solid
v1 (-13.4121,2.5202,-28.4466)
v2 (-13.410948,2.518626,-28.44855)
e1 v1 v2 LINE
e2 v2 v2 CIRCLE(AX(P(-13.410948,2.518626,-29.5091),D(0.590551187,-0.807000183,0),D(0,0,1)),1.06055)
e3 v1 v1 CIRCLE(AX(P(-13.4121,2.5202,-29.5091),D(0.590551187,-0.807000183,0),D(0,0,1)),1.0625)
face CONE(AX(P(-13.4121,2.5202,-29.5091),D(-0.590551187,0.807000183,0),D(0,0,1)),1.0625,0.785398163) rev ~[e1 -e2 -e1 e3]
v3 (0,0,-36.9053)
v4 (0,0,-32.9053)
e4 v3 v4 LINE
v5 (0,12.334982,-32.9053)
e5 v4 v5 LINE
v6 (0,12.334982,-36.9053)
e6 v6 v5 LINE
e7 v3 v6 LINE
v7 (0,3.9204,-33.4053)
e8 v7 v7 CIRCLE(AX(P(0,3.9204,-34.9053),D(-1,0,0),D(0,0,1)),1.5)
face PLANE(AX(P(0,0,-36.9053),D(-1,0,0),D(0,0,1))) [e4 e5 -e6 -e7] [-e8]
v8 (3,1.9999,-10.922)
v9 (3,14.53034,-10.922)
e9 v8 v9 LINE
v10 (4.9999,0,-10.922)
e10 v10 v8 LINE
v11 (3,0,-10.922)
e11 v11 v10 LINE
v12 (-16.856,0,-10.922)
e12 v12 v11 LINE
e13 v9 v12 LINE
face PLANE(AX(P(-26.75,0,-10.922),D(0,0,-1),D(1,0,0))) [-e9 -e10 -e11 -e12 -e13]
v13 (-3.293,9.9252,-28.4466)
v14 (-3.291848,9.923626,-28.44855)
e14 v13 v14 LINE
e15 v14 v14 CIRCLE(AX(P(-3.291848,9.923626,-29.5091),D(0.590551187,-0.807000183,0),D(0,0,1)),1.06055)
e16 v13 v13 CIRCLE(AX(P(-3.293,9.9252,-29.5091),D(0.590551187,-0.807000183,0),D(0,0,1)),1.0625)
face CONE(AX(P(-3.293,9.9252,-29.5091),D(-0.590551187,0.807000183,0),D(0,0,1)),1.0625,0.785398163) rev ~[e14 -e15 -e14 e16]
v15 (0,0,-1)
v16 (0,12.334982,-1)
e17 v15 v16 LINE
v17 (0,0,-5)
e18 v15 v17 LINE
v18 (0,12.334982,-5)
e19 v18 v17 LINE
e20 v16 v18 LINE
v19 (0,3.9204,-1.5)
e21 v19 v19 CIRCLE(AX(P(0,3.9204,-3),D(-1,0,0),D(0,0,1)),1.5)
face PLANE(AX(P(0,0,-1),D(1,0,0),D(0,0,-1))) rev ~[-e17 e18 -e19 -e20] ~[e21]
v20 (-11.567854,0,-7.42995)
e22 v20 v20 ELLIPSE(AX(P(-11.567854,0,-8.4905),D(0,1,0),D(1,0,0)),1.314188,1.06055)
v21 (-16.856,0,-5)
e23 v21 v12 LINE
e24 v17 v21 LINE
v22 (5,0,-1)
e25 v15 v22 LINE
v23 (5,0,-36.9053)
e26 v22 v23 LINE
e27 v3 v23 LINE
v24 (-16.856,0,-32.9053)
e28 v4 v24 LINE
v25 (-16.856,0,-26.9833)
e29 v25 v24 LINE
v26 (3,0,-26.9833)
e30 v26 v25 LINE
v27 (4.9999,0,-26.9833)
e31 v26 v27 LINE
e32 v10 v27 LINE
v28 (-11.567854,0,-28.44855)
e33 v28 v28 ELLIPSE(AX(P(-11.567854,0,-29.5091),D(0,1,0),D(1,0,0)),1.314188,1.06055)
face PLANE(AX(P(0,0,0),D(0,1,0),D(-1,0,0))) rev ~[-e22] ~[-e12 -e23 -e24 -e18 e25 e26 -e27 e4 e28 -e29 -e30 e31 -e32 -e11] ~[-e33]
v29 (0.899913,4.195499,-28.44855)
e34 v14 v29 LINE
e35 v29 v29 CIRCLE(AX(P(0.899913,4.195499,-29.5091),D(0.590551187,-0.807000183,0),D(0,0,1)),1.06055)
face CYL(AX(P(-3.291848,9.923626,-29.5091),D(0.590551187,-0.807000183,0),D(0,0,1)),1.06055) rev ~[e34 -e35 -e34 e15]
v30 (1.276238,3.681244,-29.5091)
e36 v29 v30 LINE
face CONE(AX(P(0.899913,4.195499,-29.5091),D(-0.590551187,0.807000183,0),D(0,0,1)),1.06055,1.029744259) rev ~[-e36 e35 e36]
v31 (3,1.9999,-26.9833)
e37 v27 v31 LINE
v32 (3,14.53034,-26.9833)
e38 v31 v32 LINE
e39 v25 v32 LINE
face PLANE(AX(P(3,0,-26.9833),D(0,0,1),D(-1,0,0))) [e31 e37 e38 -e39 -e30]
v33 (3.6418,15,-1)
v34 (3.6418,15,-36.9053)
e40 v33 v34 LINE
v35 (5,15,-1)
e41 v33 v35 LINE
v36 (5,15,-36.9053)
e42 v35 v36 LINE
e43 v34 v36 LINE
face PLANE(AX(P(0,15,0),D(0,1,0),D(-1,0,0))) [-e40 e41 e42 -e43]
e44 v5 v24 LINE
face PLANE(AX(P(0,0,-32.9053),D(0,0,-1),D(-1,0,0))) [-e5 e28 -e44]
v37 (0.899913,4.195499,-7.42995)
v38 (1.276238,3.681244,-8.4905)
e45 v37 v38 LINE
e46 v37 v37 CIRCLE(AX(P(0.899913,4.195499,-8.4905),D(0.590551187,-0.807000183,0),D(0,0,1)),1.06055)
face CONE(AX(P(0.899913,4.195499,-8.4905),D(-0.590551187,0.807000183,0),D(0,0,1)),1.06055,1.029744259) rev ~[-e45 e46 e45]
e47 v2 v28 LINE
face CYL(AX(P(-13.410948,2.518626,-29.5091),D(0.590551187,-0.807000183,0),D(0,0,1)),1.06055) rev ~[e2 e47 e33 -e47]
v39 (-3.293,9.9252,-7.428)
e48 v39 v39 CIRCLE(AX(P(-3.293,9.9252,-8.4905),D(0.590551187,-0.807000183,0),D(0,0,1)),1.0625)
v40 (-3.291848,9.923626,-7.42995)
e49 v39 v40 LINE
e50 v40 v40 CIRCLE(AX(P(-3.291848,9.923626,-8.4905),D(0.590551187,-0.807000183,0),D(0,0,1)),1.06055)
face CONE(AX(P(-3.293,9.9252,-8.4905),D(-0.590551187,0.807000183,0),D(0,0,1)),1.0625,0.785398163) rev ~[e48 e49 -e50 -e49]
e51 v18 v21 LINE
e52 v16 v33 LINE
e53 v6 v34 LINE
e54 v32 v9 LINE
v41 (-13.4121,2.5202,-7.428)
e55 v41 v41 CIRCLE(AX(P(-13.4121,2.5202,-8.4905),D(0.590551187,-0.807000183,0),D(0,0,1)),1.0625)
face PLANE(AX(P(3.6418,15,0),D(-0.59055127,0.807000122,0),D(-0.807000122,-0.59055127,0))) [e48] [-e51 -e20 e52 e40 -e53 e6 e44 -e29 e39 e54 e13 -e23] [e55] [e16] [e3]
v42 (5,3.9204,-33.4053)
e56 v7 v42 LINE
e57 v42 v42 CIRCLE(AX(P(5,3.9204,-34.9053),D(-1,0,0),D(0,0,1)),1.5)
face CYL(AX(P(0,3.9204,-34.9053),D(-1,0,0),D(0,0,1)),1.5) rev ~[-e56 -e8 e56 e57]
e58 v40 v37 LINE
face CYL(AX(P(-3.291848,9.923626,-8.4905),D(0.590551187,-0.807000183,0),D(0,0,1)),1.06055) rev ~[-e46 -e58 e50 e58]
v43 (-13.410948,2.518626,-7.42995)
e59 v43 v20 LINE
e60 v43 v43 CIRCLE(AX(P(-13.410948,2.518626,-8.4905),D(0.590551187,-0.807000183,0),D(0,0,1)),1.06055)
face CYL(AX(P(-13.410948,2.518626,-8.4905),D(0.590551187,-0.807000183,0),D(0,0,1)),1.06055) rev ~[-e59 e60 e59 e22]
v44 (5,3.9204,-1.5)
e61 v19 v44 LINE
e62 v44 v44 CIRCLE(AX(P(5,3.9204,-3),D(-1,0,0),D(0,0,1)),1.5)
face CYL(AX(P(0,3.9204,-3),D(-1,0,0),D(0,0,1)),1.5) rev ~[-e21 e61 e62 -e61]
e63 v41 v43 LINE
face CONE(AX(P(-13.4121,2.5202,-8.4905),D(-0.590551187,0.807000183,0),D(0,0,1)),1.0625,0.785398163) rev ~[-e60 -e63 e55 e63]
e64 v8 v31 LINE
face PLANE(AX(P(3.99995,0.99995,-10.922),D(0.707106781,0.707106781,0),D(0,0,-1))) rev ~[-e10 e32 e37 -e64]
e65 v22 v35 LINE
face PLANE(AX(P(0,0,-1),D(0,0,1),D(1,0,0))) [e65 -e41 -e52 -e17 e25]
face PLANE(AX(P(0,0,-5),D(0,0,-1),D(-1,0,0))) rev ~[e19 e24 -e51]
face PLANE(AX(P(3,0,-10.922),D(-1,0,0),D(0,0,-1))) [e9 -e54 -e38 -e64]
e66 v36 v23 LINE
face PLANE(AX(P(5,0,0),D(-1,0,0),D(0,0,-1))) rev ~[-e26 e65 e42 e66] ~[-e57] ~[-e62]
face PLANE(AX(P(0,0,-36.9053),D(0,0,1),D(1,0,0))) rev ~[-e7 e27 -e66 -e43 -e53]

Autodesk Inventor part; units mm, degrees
ref_plane "YZ Plane" through (0, 0, 0) normal (1, 0, 0) x (0, 1, 0)
ref_plane "XZ Plane" through (0, 0, 0) normal (0, 1, 0) x (-1, 0, 0)
sketch "Sketch2" plane through (0, 0, 0) normal (0, 1, 0) x (-1, 0, 0)
  line L0 (0, 0) -> (23.273, 0)
  line L1 (23.273, 0) -> (23.273, -37.9053)
  line L2 (23.273, -37.9053) -> (0, -37.9053)
  line L3 (0, -37.9053) -> (0, 0)
  line L4 (26.75, 0) -> (-5, 0)
  line L5 (-5, 0) -> (-5, -37.9053)
  line L6 (-5, -37.9053) -> (26.75, -37.9053)
  line L7 (26.75, -37.9053) -> (26.75, 0)
  point P0 (0, -37.9053)
  dimension "d21" = 37.9053
  dimension "d22" = 23.273
  dimension "d36" = 5
  dimension "d37" = 31.75
extrude "Extrusion1" add sketch "Sketch2" along normal blind 15
sketch "Sketch6" plane through (-26.75, 0, 0) normal (0, 0, 1) x (1, 0, 0)
  line L0 (31.75, 0) -> (31.75, 15) projected
  line L1 (31.75, 0) -> (31.75, 15)
  line L2 (31.75, 0) -> (0, 0) projected
  line L3 (30.3918, 0) -> (30.3918, 15)
  line L4 (31.75, 15) -> (0, 15) projected
  line L5 (30.3918, 15) -> (55.3918, 15) construction
  line L6 (0, 0) -> (0, 15) projected
  line L7 (0, 0) -> (0, 0.5)
  line L8 (30.3918, 15) -> (9.894, 0)
  point P0 (26.75, 0)
  dimension "d38" = 1.3582
  dimension "d41" = 0.5
  dimension "d96" = 25.4
  dimension "d97" = 53.804
extrude "Extrusion2" cut sketch "Sketch6" against normal up to surface (37.9053 mm away) contours L8 L2 L6 L4
sketch "Sketch8" plane through (0, 0, 0) normal (0, -1, 0) x (1, 0, 0)
  line L0 (-26.75, -37.9053) -> (-26.75, 0) projected
  line L1 (-26.75, -10.922) -> (3, -10.922)
  line L2 (3, -10.922) -> (3, -26.9833)
  line L3 (3, -26.9833) -> (-26.75, -26.9833)
  line L4 (-26.75, -26.9833) -> (-26.75, -10.922)
  line L5 (-26.75, 0) -> (5, 0) projected
  line L6 (5, -37.9053) -> (-26.75, -37.9053) projected
  line L7 (5, 0) -> (5, -37.9053) projected
  point P0 (0, 0)
  point P1 (-26.75, -26.9833)
  dimension "d44" = 10.922
  dimension "d45" = 10.922
  dimension "d46" = 2
extrude "Extrusion3" cut sketch "Sketch8" against normal blind 25.4 contours L0 L1 L2 L3
ref_plane "Work Plane1" through (4.3209, 15, 0) normal (0, 1, 0) x (1, 0, 0)
sketch "Sketch12" plane through (0, 0, 0) normal (0, -1, 0) x (1, 0, 0)
  line L0 (3.6418, 0) -> (-26.75, 0) projected
  line L1 (-26.75, 0) -> (0, 0)
  line L2 (0, 0) -> (0, -5)
  line L3 (0, -5) -> (-26.75, -5)
  line L4 (-26.75, -5) -> (-26.75, 0)
  line L5 (-26.75, -37.9053) -> (0, -37.9053)
  line L6 (0, -37.9053) -> (0, -32.9053)
  line L7 (0, -32.9053) -> (-26.75, -32.9053)
  line L8 (-26.75, -32.9053) -> (-26.75, -37.9053)
  line L9 (5, 0) -> (0, 0)
  line L10 (0, 0) -> (0, -1)
  line L11 (0, -1) -> (5, -1)
  line L12 (5, -1) -> (5, 0)
  line L13 (5, 0) -> (5, -37.9053) projected
  line L14 (5, -37.9053) -> (0, -37.9053)
  line L15 (0, -37.9053) -> (0, -36.9053)
  line L16 (0, -36.9053) -> (5, -36.9053)
  line L17 (5, -36.9053) -> (5, -37.9053)
  line L18 (5, -37.9053) -> (-26.75, -37.9053) projected
  point P0 (0, -37.9053)
  dimension "d69" = 5
  dimension "d70" = 5
  dimension "d73" = 1
  dimension "d74" = 1
  dimension "d75" = 0
extrude "Extrusion6" cut sketch "Sketch12" along normal through all both and the other way through all
sketch "Sketch13" plane through (0, 0, -36.9053) normal (-1, 0, 0) x (0, 0, 1)
  circle A0 centre (2, 3.9204) radius 1.5
  circle A1 centre (33.9053, 3.9204) radius 1.5
  line L0 (35.9053, 0) -> (31.9053, 0) projected
  line L1 (31.9053, 7.8408) -> (35.9053, 7.8408) projected
  line L2 (35.9053, 12.335) -> (35.9053, 0) projected
  line L3 (31.9053, 2) -> (31.9053, 7.8408) projected
  line L4 (0, 0) -> (0, 12.335) projected
  line L5 (0, 7.8408) -> (4, 7.8408) projected
  line L6 (4, 0) -> (0, 0) projected
  point P0 (36.9053, 0)
  point P1 (35.9053, 8.636)
  point P2 (0, 8.636)
  dimension "d80" = 3
  dimension "d81" = 3
  dimension "d82" = 7.8408
  dimension "d83" = 3.9204
  dimension "d84" = 4
  dimension "d85" = 2
  dimension "d86" = 2
  dimension "d87" = 3.9204
  dimension "d88" = 31.9053
  dimension "d148" = 3.9204
extrude "Extrusion7" cut sketch "Sketch13" against normal blind 25.4
sketch "Sketch15" plane through (3, 14.5303, -10.922) normal (-0.5905512, 0.8070002, 0) x (0.8070002, 0.5905512, 0)
  circle A0 centre (-20.3372, -2.4315) radius 1.1146
  circle A1 centre (-7.798, 18.5871) radius 1.229
  line L0 (-20.3372, -2.4315) -> (-20.3372, 18.5871)
  line L1 (-20.3372, 18.5871) -> (-7.798, 18.5871)
  line L2 (-7.798, 18.5871) -> (-7.798, -2.4315)
  line L3 (-7.798, -2.4315) -> (-20.3372, -2.4315)
  line L4 (-12.87, 2.62) -> (-12.87, 13.4413)
  line L5 (-12.87, 13.4413) -> (-2.4234, 13.4413)
  line L6 (-2.4234, 13.4413) -> (-2.4234, 2.62)
  line L7 (-2.4234, 2.62) -> (-12.87, 2.62)
  line L8 (-22.1086, -4.4694) -> (-22.1086, 20.5306)
  line L9 (-22.1086, 20.5306) -> (1.8914, 20.5306)
  line L10 (1.8914, 20.5306) -> (1.8914, -4.4694)
  line L11 (1.8914, -4.4694) -> (-22.1086, -4.4694)
  line L12 (-3.7175, 21.9833) -> (-24.6047, 21.9833) projected
  line L13 (-24.6047, -5.922) -> (-3.7175, -5.922) projected
  circle A2 centre (-20.3372, 18.5871) radius 1.1245
  line L14 (0, 16.0613) -> (0, 0) projected
  line L15 (1.8914, -9.922) -> (1.8914, 25.9833) projected
  circle A3 centre (-7.798, -2.4315) radius 1.1245
  point P0 (-11.0019, -10.922)
  dimension "d107" = 21.0186
  dimension "d108" = 12.5392
  dimension "d110" = 25
  dimension "d111" = 24
  dimension "d112" = 4.3148
  dimension "d113" = 9.2386
  dimension "d114" = 7.0893
  dimension "d115" = 7.0893
  dimension "d117" = 1.9436
  dimension "d118" = 2.0378
  dimension "d119" = 1.7714
  dimension "d120" = 9.6893
  dimension "d122" = 1.4526
  dimension "d123" = 1.4526
  dimension "d124" = 2.249
  dimension "d133" = 0
  dimension "d134" = 2.249
hole "Hole3" at (-13.4121, 2.5202, -8.4905) at (-3.293, 9.9252, -8.4905) at (-3.293, 9.9252, -29.5091) at (-13.4121, 2.5202, -29.5091) direction (0.5905512, -0.8070002, 0) diameter 2.1211 depth 7.1 tip angle 118 countersink diameter 2.125 countersink angle 90 thread size "M2.5x0.35" class "6H" standard "ANSI Metric M Profile"
chamfer "Chamfer3" distance 2 distance2 2 1 edges at (3, 0, -18.9526) measured on face at (-2.4276, 0, -8.2115)
equation "\"d83\" = 0.5 * d82"
equation "\"d85\" = 0.5 * d84"
equation "\"d86\" = d85"
equation "\"d87\" = d83"
equation "\"d115\" = d114"
equation "\"d122\" = d123"
properties part number "Camera Angle"
